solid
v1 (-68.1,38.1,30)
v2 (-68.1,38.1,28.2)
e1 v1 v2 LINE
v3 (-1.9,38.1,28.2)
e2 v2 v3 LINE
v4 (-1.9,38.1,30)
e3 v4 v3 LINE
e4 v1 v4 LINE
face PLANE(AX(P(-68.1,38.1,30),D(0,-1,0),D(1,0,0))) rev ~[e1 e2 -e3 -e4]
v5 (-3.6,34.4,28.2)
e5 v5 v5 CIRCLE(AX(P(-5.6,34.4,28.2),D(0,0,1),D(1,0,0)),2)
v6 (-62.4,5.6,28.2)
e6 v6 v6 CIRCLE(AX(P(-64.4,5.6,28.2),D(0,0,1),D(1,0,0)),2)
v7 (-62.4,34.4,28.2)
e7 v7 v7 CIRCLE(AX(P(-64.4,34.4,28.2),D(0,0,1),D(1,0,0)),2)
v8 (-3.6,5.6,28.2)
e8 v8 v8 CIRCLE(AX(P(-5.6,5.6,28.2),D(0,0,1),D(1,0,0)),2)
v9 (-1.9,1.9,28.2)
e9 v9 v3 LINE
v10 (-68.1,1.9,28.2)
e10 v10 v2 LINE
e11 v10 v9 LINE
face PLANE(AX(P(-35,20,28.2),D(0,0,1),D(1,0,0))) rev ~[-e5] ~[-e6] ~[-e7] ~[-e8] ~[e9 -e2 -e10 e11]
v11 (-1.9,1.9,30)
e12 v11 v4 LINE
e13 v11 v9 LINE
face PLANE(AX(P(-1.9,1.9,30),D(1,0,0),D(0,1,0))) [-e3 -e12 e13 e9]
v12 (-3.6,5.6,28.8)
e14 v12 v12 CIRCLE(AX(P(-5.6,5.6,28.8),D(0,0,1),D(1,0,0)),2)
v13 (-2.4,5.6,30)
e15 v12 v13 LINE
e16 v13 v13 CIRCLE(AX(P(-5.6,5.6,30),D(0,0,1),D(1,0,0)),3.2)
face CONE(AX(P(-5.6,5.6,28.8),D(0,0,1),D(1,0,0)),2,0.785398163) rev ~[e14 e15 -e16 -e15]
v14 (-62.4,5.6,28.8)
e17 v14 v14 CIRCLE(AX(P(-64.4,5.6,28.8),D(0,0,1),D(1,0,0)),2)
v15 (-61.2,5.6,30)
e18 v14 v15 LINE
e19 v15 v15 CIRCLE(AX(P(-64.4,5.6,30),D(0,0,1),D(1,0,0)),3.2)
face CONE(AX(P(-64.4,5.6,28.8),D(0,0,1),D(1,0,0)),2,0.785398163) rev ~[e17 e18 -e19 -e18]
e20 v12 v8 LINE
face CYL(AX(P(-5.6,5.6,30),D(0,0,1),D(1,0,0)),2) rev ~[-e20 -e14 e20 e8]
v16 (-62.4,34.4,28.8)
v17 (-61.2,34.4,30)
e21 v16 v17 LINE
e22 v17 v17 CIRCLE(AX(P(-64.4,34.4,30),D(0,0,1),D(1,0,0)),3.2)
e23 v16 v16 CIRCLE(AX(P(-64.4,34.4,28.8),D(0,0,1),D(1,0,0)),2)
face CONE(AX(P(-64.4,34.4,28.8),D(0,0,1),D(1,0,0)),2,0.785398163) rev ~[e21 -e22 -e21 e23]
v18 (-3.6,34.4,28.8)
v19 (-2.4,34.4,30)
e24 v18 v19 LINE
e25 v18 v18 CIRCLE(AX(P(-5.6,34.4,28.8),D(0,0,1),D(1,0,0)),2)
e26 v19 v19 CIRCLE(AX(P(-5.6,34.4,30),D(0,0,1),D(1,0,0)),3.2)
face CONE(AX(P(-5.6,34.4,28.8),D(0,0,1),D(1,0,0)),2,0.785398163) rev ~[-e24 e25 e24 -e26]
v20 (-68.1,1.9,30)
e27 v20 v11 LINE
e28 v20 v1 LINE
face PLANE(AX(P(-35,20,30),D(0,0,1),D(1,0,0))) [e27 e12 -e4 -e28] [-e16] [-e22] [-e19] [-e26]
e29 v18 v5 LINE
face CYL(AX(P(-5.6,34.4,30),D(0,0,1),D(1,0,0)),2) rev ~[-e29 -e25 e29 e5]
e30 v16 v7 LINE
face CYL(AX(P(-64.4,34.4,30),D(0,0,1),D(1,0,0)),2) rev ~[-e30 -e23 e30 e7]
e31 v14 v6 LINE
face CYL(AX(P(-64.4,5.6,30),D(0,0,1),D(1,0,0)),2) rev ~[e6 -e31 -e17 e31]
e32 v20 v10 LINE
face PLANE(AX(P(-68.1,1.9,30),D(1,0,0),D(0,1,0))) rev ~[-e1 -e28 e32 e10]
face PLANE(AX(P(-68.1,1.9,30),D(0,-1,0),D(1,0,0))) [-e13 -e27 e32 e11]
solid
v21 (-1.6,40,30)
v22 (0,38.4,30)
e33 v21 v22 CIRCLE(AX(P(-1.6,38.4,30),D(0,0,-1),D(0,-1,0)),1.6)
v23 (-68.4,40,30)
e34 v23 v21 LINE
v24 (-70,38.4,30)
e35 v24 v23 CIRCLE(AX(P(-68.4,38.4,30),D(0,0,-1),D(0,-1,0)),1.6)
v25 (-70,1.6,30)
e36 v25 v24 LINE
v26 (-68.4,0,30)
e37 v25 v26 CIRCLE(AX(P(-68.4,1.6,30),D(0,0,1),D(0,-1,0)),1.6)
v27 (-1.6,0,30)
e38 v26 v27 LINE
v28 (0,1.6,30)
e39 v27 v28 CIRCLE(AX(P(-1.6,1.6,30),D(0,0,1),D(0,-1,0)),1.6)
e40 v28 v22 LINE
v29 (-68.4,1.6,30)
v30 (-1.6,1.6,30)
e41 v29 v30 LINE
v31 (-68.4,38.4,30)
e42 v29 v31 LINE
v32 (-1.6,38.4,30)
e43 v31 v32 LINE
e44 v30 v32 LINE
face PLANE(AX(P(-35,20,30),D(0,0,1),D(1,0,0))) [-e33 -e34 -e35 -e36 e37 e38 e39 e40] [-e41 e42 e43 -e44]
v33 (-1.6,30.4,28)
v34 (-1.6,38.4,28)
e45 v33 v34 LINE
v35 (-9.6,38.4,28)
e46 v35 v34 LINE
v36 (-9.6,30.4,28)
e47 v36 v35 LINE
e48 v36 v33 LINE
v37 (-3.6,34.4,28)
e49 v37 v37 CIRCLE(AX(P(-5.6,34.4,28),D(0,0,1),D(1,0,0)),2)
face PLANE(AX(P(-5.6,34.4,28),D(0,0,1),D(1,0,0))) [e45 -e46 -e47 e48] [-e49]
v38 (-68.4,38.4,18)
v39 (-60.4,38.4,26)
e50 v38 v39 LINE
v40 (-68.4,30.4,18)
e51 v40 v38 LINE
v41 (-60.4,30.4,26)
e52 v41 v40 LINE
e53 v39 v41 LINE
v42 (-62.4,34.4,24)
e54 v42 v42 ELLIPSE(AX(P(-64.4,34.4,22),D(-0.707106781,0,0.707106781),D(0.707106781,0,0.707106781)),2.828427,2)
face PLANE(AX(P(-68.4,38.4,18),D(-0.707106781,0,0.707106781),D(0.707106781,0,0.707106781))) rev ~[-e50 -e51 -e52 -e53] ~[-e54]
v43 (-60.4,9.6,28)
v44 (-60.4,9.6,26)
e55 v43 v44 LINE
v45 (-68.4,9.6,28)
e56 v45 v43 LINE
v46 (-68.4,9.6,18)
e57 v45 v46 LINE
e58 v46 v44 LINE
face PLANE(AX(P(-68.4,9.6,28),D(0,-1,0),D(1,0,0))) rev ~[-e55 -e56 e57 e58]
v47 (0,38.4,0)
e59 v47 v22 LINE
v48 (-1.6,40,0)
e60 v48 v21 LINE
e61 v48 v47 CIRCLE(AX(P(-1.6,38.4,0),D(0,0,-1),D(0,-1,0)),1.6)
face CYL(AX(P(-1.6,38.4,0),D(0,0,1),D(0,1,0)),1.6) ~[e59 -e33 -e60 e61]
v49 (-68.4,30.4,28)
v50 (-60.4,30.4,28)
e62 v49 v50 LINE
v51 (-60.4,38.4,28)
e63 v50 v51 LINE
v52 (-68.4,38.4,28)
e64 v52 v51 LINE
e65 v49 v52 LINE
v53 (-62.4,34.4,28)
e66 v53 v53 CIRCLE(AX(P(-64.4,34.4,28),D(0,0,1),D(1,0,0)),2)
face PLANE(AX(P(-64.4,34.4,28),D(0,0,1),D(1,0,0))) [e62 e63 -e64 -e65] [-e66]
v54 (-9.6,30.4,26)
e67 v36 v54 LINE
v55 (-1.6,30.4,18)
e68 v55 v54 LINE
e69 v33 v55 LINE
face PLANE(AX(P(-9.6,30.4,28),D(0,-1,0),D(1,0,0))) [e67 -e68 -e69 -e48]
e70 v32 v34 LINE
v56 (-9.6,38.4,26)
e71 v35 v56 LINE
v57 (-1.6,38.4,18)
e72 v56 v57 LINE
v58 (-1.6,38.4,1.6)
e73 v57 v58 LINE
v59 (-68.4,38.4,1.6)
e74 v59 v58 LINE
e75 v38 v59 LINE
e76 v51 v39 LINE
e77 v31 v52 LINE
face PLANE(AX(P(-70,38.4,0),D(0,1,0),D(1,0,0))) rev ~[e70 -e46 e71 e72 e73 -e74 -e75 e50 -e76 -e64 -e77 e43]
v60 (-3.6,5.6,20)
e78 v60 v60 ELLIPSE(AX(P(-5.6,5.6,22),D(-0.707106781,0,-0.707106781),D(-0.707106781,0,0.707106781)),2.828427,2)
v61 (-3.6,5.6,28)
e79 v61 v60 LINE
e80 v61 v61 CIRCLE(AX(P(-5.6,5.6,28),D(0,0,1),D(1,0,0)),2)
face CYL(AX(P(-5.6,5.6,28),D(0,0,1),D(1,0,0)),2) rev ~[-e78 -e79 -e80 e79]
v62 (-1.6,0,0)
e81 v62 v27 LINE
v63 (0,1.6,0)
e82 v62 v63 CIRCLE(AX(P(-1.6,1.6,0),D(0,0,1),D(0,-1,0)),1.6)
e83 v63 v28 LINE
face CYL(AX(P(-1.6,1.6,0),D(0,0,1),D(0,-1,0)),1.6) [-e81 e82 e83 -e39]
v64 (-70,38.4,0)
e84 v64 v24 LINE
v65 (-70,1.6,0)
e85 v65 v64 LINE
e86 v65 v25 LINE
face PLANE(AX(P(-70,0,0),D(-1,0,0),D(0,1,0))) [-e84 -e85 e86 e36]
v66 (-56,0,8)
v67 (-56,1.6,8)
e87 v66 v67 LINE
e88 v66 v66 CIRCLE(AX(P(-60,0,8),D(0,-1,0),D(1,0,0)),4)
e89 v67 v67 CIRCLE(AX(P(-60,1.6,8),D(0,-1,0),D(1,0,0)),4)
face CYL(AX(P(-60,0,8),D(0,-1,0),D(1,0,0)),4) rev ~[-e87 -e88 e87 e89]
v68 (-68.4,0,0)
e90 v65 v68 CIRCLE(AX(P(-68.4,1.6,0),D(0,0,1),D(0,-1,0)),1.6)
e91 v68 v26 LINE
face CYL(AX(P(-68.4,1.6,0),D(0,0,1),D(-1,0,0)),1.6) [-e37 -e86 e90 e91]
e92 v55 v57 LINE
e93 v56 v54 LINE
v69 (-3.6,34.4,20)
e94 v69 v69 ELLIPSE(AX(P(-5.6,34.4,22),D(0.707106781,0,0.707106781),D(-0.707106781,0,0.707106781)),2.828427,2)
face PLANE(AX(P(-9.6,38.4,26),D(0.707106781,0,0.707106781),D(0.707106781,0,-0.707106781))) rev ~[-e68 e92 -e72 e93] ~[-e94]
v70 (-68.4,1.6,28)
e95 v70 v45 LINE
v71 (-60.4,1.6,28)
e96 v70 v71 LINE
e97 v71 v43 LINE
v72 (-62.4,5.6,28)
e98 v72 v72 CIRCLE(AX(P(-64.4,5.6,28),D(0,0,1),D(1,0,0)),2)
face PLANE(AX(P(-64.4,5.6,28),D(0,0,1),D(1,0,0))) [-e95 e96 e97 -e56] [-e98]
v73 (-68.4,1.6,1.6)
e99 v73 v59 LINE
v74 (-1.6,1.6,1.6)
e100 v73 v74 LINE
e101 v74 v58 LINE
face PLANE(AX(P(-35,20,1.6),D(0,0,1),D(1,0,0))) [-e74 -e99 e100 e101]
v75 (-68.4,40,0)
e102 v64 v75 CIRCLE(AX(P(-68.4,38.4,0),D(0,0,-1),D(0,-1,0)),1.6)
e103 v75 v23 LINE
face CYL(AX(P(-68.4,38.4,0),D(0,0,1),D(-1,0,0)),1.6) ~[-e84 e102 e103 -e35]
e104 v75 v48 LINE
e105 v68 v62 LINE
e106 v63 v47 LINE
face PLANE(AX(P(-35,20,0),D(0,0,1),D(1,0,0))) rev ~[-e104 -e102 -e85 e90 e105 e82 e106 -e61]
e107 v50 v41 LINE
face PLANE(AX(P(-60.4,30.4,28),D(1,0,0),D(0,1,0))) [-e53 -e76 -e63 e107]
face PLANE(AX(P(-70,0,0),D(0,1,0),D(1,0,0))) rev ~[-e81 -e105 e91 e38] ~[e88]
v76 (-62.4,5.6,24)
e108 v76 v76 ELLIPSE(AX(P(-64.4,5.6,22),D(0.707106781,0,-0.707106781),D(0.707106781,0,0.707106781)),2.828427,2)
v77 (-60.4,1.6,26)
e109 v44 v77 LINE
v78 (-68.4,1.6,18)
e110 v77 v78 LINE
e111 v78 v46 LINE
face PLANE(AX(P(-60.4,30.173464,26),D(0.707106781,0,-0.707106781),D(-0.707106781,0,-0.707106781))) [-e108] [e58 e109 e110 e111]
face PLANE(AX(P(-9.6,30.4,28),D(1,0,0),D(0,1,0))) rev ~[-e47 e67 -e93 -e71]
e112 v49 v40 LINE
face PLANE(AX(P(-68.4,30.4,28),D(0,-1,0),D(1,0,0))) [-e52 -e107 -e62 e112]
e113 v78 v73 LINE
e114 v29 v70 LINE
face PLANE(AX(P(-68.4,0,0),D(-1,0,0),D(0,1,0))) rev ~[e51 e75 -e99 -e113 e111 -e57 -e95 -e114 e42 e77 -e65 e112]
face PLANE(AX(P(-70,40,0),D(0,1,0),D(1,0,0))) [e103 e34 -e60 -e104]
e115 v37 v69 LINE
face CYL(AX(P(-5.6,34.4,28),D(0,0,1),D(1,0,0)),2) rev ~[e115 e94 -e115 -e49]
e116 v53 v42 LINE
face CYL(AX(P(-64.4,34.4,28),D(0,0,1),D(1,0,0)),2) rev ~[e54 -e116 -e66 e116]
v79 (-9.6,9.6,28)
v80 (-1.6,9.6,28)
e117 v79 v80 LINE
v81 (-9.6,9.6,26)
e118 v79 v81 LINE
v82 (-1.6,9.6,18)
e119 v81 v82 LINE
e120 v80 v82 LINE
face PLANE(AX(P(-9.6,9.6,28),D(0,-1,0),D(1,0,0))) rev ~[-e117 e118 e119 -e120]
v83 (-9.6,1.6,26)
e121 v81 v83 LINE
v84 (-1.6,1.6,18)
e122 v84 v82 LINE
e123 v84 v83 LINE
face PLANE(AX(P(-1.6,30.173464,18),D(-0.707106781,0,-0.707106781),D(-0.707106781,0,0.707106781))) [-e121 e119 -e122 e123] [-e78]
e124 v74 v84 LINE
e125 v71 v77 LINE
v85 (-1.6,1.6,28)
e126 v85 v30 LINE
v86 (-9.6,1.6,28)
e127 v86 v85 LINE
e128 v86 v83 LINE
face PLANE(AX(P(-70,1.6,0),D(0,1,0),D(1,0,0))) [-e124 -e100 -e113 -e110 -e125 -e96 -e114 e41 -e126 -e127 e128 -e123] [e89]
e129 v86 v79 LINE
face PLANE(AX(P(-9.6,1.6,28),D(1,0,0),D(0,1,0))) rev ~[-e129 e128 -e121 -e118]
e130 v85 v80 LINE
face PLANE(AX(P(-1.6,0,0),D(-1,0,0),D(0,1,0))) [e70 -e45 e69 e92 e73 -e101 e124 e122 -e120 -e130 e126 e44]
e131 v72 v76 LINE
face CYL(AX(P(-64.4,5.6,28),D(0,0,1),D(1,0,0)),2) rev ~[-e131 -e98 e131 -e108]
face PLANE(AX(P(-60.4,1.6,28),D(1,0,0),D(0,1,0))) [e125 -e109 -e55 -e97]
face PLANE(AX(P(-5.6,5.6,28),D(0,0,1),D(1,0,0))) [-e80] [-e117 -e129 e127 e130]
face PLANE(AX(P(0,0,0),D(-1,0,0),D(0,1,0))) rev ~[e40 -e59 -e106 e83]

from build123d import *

# Parameters (mm, degrees)
F0_W        = 70
F0_H        = 40
F1_DEPTH    = 30
F2_T        = -1.6
F4_W        = 8
F4_H        = 8
F4_R        = 2
F5_DEPTH    = 10
F6_T1_DEPTH = 28.5734639037
F6_T3_DEPTH = 28.5734639037
F7_R        = 4
F8_DEPTH    = 1.6
F9_W        = 66.2
F9_H        = 36.2
F9_R        = 2
F10_DEPTH   = 1.8
F11_SIZE    = 1.2
F12_R       = 1.6


# Not quite as in the source:
# - a fillet or chamfer that OpenCascade refuses, or shapes differently, is made with other operations: its cross-section is extruded or revolved along the edge and cut away or added


with BuildPart() as f1:
    # F0 (on Top) → F1 (new body)
    with BuildSketch(Plane.XY):
        with Locations((-35, 20)):
            Rectangle(F0_W, F0_H)
    extrude(amount=F1_DEPTH)

    # F2
    f2_openings = [f1.faces().sort_by_distance(p)[0] for p in [
        (-35, 20, 30),
    ]]
    offset(amount=F2_T, openings=f2_openings)

    # F4 (on offset) → F5 (join)
    with BuildSketch(Plane.XY.offset(28)):
        with Locations((-64.4, 34.4)):
            Rectangle(F4_W, F4_H)
        with Locations((-64.4, 34.4)):
            Circle(F4_R, mode=Mode.SUBTRACT)
        with Locations((-5.6, 34.4)):
            Rectangle(F4_W, F4_H)
        with Locations((-5.6, 34.4)):
            Circle(F4_R, mode=Mode.SUBTRACT)
        with Locations((-5.6, 5.6)):
            Rectangle(F4_W, F4_H)
        with Locations((-5.6, 5.6)):
            Circle(F4_R, mode=Mode.SUBTRACT)
        with Locations((-64.4, 5.6)):
            Rectangle(F4_W, F4_H)
        with Locations((-64.4, 5.6)):
            Circle(F4_R, mode=Mode.SUBTRACT)
    extrude(amount=-F5_DEPTH)

    # F6: chamfer of 8 on 4 edges, made by hand

    # F6_s2 → F6_t1 (cut)
    with BuildSketch(Plane.XZ.offset(-38.4)):
        Polygon((-68.4, 18), (-60.4, 26), (-60.4, 18), align=None)
        Polygon((-9.6, 26), (-1.6, 18), (-9.6, 18), align=None)
    extrude(amount=F6_T1_DEPTH, mode=Mode.SUBTRACT)

    # F6_s4 → F6_t3 (cut)
    with BuildSketch(Plane.XZ.offset(-30.1734639037)):
        Polygon((-60.4, 26), (-68.4, 18), (-60.4, 18), align=None)
        Polygon((-1.6, 18), (-9.6, 26), (-9.6, 18), align=None)
    extrude(amount=F6_T3_DEPTH, mode=Mode.SUBTRACT)

    # F7 (on face) → F8 (cut, through all)
    with BuildSketch(Plane.XZ):
        with Locations((-60, 8)):
            Circle(F7_R)
    extrude(amount=-F8_DEPTH, mode=Mode.SUBTRACT)

    # F12
    f12_edges = [f1.edges().sort_by_distance(p)[0] for p in [
        (-70, 0, 15),
        (0, 0, 15),
        (0, 40, 15),
        (-70, 40, 15),
    ]]
    fillet(f12_edges, radius=F12_R)


with BuildPart() as f10:
    # F9 (on face) → F10 (new body)
    with BuildSketch(Plane.XY.offset(30)):
        with Locations((-35, 20)):
            Rectangle(F9_W, F9_H)
        with Locations((-64.4, 5.6)):
            Circle(F9_R, mode=Mode.SUBTRACT)
        with Locations((-5.6, 5.6)):
            Circle(F9_R, mode=Mode.SUBTRACT)
        with Locations((-64.4, 34.4)):
            Circle(F9_R, mode=Mode.SUBTRACT)
        with Locations((-5.6, 34.4)):
            Circle(F9_R, mode=Mode.SUBTRACT)
    extrude(amount=-F10_DEPTH)

    # F11
    f11_edges = [f10.edges().sort_by_distance(p)[0] for p in [
        (-66.4, 34.4, 30),
        (-7.6, 34.4, 30),
        (-7.6, 5.6, 30),
        (-66.4, 5.6, 30),
    ]]
    chamfer(f11_edges, length=F11_SIZE)


solid = Compound([f1.part, f10.part])
